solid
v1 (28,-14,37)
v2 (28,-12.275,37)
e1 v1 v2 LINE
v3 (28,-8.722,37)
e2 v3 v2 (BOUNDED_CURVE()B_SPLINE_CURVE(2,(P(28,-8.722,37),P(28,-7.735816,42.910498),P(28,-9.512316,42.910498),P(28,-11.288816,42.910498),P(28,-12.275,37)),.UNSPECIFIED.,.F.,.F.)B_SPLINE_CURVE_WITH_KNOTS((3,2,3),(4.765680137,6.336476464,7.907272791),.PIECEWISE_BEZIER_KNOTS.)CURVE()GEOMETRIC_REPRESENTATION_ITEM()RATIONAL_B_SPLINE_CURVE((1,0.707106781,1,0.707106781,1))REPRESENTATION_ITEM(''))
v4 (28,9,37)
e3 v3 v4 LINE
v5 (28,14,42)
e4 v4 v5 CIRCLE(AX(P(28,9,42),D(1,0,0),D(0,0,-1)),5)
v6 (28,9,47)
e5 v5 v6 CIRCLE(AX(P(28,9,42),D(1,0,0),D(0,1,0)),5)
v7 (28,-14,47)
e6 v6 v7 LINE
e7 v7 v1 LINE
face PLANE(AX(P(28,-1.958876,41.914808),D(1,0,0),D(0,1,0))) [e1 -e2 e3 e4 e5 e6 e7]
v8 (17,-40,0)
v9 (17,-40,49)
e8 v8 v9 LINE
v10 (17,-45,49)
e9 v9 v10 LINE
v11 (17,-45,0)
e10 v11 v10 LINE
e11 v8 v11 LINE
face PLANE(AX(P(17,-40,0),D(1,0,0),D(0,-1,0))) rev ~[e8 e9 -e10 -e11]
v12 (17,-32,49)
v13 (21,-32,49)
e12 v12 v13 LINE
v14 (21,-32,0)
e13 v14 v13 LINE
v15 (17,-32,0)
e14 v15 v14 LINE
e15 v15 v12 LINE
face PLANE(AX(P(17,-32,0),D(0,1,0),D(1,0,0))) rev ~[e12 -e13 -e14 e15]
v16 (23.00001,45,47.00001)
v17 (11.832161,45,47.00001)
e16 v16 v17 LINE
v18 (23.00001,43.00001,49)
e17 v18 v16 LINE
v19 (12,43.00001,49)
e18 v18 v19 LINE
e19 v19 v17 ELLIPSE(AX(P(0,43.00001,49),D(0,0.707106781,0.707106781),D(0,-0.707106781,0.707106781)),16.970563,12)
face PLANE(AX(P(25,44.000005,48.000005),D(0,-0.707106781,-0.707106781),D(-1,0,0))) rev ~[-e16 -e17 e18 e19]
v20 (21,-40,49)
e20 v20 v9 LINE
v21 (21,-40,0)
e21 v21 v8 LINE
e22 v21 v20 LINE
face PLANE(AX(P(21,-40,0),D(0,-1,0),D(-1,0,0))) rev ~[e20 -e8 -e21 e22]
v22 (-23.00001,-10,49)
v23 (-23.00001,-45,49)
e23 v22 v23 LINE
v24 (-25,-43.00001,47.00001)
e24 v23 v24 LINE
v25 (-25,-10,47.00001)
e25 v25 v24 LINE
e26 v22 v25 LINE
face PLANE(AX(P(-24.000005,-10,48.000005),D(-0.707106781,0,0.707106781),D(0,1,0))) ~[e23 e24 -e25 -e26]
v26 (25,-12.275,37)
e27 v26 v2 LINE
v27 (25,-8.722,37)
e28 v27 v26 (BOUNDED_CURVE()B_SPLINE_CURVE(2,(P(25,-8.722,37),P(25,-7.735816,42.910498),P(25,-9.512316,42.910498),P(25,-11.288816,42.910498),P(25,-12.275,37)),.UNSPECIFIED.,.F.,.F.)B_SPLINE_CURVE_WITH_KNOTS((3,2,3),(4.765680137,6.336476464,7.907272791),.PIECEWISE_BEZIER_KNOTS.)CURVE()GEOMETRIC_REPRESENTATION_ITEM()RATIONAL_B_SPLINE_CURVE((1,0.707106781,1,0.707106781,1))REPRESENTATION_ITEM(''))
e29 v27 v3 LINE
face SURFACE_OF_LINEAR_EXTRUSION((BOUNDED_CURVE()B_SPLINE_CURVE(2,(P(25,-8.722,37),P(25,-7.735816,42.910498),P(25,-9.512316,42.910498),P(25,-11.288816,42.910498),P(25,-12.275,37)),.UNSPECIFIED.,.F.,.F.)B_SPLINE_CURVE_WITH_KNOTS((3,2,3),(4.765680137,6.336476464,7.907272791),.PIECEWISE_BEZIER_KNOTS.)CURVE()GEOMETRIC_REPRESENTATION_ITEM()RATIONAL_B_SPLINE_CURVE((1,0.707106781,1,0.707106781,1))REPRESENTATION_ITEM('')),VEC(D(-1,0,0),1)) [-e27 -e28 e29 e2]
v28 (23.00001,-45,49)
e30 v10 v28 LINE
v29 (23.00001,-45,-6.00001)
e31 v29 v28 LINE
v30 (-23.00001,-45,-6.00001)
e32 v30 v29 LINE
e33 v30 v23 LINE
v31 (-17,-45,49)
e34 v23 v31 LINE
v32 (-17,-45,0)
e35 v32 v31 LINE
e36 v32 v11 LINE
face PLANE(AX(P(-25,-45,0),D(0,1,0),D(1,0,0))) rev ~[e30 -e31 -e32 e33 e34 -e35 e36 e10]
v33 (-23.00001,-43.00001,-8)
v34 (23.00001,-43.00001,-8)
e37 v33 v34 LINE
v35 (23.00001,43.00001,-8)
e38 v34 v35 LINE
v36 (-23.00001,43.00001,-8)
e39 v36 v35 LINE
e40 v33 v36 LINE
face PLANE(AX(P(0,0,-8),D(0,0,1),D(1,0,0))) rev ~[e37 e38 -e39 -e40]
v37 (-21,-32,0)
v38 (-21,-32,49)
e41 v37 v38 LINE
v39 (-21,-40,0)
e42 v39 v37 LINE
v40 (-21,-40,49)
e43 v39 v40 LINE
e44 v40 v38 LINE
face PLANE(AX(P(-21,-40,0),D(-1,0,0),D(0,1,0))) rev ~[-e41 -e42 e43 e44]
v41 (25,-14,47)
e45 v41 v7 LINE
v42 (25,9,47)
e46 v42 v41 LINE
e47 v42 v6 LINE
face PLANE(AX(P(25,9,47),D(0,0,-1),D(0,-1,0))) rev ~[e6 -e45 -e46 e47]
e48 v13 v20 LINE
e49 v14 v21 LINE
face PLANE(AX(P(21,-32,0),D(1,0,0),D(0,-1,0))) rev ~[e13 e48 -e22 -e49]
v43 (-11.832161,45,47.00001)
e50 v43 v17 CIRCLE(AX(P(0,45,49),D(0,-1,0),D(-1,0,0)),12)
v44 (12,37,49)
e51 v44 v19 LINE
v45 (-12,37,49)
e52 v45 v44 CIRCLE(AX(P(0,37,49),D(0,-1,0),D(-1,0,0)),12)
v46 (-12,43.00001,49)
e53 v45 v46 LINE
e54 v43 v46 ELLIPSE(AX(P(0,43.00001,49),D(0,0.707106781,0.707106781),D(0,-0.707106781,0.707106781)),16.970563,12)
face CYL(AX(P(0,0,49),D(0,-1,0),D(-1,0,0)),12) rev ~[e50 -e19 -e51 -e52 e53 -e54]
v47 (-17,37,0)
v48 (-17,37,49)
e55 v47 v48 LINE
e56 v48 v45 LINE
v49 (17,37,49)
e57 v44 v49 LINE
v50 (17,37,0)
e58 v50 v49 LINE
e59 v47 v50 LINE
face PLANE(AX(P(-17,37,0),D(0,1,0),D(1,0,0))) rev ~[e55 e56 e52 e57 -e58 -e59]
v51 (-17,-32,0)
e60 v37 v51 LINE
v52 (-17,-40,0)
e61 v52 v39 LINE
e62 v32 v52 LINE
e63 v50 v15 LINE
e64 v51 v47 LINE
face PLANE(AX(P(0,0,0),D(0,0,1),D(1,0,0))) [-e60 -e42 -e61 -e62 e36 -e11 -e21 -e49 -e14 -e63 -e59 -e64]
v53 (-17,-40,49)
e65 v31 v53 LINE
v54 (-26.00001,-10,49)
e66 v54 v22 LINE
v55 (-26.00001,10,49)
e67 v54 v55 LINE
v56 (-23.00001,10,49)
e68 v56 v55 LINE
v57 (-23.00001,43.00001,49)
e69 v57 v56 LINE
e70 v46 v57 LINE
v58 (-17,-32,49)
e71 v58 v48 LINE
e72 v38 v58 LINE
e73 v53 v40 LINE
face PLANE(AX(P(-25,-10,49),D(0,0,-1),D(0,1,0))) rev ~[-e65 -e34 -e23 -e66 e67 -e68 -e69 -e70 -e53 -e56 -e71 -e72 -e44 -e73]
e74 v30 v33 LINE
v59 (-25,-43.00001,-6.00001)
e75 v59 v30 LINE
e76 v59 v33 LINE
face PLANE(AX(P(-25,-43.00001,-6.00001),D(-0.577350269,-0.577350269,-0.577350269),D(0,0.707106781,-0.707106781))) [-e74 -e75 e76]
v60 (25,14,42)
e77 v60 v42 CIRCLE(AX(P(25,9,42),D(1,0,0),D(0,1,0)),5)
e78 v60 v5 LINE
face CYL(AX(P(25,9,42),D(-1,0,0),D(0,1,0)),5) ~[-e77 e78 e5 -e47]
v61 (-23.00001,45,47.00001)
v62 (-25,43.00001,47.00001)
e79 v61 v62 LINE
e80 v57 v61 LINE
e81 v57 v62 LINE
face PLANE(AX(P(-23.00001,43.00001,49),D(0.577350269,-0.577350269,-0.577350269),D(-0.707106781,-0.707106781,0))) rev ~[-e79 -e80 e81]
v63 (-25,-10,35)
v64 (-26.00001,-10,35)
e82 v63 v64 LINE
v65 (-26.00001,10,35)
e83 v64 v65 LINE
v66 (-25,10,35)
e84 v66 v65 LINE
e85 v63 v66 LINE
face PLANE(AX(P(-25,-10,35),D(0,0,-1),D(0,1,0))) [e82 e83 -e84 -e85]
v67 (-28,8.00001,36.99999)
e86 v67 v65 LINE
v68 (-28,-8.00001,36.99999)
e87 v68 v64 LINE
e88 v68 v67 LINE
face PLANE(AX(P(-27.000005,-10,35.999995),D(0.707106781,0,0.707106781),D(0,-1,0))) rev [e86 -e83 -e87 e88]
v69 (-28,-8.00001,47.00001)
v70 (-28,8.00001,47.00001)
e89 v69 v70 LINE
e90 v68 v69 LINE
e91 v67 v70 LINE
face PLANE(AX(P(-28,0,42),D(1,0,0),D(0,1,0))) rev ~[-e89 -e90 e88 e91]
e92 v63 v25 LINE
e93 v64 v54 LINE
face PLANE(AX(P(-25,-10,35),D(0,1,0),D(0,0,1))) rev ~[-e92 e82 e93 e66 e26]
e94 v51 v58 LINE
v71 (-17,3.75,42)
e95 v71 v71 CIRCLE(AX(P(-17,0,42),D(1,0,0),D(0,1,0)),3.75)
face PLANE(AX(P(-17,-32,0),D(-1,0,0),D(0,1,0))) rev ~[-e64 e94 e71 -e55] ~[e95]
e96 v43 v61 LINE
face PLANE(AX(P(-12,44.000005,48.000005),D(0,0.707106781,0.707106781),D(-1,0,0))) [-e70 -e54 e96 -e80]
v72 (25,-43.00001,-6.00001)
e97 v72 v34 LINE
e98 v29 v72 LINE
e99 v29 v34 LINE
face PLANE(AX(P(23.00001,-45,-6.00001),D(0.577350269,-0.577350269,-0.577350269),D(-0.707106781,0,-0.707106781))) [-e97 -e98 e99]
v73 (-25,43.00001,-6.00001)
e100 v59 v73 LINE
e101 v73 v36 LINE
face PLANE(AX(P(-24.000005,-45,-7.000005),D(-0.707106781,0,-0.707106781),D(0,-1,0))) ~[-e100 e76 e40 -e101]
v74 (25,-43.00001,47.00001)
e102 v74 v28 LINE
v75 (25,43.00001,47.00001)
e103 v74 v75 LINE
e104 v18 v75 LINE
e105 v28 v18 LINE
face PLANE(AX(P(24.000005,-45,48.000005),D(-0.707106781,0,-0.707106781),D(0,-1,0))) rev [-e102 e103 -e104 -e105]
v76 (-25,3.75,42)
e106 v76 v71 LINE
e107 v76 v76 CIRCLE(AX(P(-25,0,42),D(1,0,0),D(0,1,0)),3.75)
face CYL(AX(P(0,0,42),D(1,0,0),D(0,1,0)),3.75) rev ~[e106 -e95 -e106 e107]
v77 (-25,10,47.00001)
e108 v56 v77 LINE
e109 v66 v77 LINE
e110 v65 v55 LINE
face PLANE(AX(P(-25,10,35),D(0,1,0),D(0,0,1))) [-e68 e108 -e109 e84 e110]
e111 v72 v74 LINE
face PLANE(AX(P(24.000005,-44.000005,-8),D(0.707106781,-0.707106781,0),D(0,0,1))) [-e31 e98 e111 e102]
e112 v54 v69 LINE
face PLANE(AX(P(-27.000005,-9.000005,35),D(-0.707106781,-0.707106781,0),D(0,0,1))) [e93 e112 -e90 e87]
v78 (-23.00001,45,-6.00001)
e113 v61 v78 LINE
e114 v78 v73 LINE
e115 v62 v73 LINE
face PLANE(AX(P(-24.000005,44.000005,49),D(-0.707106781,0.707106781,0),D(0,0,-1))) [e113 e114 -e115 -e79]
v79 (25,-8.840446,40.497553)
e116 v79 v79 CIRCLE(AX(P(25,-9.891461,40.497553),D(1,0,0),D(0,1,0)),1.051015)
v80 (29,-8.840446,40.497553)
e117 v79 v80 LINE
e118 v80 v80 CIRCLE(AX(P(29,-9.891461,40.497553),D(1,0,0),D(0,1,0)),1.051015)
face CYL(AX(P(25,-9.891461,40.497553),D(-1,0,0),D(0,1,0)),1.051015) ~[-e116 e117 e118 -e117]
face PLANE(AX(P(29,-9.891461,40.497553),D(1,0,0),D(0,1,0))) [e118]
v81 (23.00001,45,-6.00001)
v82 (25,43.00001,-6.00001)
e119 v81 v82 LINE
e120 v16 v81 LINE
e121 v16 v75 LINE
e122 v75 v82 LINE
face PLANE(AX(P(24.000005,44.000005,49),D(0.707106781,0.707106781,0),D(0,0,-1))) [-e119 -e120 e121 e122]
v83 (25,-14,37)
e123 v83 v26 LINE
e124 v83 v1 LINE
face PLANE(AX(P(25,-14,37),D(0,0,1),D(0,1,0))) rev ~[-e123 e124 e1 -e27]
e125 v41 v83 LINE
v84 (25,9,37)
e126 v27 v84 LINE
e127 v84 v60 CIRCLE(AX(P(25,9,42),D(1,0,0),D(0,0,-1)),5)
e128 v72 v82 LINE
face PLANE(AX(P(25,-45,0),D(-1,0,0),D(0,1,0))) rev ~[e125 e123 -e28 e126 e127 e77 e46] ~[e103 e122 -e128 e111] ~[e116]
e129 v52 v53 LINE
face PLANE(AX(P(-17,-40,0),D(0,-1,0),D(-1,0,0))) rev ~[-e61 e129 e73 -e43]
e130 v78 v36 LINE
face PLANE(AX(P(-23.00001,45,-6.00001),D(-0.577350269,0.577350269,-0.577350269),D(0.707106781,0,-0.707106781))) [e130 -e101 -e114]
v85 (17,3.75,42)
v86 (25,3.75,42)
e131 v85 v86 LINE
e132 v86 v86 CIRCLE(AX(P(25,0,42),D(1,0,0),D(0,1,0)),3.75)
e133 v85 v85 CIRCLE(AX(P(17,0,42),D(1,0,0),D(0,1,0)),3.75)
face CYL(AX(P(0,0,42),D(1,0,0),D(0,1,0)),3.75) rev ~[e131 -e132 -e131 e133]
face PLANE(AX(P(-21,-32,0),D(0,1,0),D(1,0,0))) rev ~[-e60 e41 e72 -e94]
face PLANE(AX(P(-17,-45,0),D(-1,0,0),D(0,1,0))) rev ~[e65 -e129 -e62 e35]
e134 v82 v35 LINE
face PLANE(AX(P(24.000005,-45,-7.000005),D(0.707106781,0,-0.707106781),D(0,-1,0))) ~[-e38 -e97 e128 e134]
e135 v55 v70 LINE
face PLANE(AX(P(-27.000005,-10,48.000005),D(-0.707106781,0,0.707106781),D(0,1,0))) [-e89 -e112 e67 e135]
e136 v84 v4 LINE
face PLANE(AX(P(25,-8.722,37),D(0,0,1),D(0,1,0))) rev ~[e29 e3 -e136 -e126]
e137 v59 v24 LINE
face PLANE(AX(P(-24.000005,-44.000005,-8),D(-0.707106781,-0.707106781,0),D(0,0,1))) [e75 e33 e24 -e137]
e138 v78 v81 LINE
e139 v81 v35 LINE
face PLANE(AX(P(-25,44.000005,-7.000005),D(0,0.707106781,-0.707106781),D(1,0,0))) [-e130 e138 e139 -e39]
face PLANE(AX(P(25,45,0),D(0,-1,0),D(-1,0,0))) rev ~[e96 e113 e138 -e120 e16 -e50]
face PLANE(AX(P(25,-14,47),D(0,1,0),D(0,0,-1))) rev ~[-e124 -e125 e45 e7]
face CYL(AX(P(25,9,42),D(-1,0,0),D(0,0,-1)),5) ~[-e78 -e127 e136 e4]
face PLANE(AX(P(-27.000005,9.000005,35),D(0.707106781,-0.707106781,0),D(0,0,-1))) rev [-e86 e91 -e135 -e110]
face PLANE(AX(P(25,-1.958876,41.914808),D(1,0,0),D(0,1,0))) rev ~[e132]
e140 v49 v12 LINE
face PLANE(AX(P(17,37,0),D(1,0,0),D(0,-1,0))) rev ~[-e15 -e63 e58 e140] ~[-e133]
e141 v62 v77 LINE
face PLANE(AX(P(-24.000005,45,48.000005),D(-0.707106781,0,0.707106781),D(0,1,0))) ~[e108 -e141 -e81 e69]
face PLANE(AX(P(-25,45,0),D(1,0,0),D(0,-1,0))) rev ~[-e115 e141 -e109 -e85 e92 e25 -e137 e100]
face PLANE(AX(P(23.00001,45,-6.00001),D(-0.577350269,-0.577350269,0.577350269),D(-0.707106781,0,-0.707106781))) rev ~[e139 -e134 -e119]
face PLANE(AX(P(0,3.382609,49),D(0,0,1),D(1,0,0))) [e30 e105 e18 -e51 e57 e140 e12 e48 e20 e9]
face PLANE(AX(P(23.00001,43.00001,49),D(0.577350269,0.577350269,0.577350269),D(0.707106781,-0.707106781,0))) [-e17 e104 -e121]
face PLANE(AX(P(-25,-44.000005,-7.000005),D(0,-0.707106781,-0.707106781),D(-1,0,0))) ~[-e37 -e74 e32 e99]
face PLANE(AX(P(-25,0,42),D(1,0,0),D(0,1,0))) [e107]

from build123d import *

# Parameters (mm, degrees)
F0_W      = 50
F0_H      = 90
F1_DEPTH  = 8
F3_DEPTH  = 49
F4_R      = 3.75
F5_DEPTH  = 25
F7_DEPTH  = 50
F9_START  = -25
F8_W      = 20
F8_H      = 14
F9_DEPTH  = 3
F11_START = 25
F11_DEPTH = 3
F13_START = 25
F12_R     = 1.0510148408
F13_DEPTH = 4
F14_SIZE  = 1.99999


# Not quite as in the source:
# - a fillet or chamfer is up to 0.001 mm smaller than in the source, because OpenCascade refuses the exact size


with BuildPart() as f1:
    # F0 (on Top) → F1 (new body)
    with BuildSketch(Plane.XY):
        Rectangle(F0_W, F0_H)
    extrude(amount=-F1_DEPTH)

    # F2 (on Top) → F3 (join)
    with BuildSketch(Plane.XY):
        Polygon((-17, 45), (-25, 45), (-25, 37), (-25, -45), (-17, -45), (-17, -40), (-21, -40), (-21, -32), (-17, -32), (-17, 37), (17, 37), (17, -32), (21, -32), (21, -40), (17, -40), (17, -45), (25, -45), (25, 37), (25, 45), (17, 45), align=None)
    extrude(amount=F3_DEPTH)

    # F4 (on Right) → F5 (cut, symmetric)
    with BuildSketch(Plane.YZ):
        with Locations((0, 42)):
            Circle(F4_R)
    extrude(amount=F5_DEPTH, both=True, mode=Mode.SUBTRACT)

    # F6 (on Front) → F7 (cut)
    with BuildSketch(Plane.XZ):
        with BuildLine():
            ThreePointArc((-12, 49), (0, 37), (12, 49))
            Line((12, 49), (-12, 49))
        make_face()
    extrude(amount=-F7_DEPTH, mode=Mode.SUBTRACT)

    # F8 (on Right) → F9 (join)
    with BuildSketch(Plane.YZ.offset(F9_START)):
        with Locations((0, 42)):
            Rectangle(F8_W, F8_H)
    extrude(amount=-F9_DEPTH)

    # F10 (on Right) → F11 (join)
    with BuildSketch(Plane.YZ.offset(F11_START)):
        with BuildLine():
            ThreePointArc((14, 42), (12.5355339059, 45.5355339059), (9, 47))
            Line((9, 47), (-14, 47))
            Line((-14, 47), (-14, 37))
            Line((-14, 37), (-12.275, 37))
            add(Edge.make_bspline(
                [(-8.722, 37), (-7.7358158763, 42.9104981706), (-9.5123158763, 42.9104981706), (-11.2888158763, 42.9104981706), (-12.275, 37)],
                knots=[4.765680137, 4.765680137, 4.765680137, 6.3364764638, 6.3364764638, 7.9072727906, 7.9072727906, 7.9072727906], degree=2, weights=[1, 0.7071067812, 1, 0.7071067812, 1]))
            Line((-8.722, 37), (9, 37))
            ThreePointArc((9, 37), (12.5355339059, 38.4644660941), (14, 42))
        make_face()
    extrude(amount=F11_DEPTH)

    # F12 (on Right) → F13 (join)
    with BuildSketch(Plane.YZ.offset(F13_START)):
        with Locations((-9.8914606497, 40.4975526035)):
            Circle(F12_R)
    extrude(amount=F13_DEPTH)

    # F14 (size 2 in the source; OpenCascade refuses exactly that, so slightly less here)
    f14_edges = [f1.edges().sort_by_distance(p)[0] for p in [
        (25, 0, -8),
        (25, -45, 20.5),
        (0, -45, -8),
        (-25, -45, 20.5),
        (-25, 0, -8),
        (-25, 45, 20.5),
        (25, 45, 20.5),
        (0, 45, -8),
        (-28, 0, 49),
        (-18.5, 45, 49),
        (18.5, 45, 49),
        (25, 0, 49),
        (-25, 27.5, 49),
        (-25, -27.5, 49),
        (-28, 10, 42),
        (-28, 0, 35),
        (-28, -10, 42),
    ]]
    chamfer(f14_edges, length=F14_SIZE)


solid = f1.part
